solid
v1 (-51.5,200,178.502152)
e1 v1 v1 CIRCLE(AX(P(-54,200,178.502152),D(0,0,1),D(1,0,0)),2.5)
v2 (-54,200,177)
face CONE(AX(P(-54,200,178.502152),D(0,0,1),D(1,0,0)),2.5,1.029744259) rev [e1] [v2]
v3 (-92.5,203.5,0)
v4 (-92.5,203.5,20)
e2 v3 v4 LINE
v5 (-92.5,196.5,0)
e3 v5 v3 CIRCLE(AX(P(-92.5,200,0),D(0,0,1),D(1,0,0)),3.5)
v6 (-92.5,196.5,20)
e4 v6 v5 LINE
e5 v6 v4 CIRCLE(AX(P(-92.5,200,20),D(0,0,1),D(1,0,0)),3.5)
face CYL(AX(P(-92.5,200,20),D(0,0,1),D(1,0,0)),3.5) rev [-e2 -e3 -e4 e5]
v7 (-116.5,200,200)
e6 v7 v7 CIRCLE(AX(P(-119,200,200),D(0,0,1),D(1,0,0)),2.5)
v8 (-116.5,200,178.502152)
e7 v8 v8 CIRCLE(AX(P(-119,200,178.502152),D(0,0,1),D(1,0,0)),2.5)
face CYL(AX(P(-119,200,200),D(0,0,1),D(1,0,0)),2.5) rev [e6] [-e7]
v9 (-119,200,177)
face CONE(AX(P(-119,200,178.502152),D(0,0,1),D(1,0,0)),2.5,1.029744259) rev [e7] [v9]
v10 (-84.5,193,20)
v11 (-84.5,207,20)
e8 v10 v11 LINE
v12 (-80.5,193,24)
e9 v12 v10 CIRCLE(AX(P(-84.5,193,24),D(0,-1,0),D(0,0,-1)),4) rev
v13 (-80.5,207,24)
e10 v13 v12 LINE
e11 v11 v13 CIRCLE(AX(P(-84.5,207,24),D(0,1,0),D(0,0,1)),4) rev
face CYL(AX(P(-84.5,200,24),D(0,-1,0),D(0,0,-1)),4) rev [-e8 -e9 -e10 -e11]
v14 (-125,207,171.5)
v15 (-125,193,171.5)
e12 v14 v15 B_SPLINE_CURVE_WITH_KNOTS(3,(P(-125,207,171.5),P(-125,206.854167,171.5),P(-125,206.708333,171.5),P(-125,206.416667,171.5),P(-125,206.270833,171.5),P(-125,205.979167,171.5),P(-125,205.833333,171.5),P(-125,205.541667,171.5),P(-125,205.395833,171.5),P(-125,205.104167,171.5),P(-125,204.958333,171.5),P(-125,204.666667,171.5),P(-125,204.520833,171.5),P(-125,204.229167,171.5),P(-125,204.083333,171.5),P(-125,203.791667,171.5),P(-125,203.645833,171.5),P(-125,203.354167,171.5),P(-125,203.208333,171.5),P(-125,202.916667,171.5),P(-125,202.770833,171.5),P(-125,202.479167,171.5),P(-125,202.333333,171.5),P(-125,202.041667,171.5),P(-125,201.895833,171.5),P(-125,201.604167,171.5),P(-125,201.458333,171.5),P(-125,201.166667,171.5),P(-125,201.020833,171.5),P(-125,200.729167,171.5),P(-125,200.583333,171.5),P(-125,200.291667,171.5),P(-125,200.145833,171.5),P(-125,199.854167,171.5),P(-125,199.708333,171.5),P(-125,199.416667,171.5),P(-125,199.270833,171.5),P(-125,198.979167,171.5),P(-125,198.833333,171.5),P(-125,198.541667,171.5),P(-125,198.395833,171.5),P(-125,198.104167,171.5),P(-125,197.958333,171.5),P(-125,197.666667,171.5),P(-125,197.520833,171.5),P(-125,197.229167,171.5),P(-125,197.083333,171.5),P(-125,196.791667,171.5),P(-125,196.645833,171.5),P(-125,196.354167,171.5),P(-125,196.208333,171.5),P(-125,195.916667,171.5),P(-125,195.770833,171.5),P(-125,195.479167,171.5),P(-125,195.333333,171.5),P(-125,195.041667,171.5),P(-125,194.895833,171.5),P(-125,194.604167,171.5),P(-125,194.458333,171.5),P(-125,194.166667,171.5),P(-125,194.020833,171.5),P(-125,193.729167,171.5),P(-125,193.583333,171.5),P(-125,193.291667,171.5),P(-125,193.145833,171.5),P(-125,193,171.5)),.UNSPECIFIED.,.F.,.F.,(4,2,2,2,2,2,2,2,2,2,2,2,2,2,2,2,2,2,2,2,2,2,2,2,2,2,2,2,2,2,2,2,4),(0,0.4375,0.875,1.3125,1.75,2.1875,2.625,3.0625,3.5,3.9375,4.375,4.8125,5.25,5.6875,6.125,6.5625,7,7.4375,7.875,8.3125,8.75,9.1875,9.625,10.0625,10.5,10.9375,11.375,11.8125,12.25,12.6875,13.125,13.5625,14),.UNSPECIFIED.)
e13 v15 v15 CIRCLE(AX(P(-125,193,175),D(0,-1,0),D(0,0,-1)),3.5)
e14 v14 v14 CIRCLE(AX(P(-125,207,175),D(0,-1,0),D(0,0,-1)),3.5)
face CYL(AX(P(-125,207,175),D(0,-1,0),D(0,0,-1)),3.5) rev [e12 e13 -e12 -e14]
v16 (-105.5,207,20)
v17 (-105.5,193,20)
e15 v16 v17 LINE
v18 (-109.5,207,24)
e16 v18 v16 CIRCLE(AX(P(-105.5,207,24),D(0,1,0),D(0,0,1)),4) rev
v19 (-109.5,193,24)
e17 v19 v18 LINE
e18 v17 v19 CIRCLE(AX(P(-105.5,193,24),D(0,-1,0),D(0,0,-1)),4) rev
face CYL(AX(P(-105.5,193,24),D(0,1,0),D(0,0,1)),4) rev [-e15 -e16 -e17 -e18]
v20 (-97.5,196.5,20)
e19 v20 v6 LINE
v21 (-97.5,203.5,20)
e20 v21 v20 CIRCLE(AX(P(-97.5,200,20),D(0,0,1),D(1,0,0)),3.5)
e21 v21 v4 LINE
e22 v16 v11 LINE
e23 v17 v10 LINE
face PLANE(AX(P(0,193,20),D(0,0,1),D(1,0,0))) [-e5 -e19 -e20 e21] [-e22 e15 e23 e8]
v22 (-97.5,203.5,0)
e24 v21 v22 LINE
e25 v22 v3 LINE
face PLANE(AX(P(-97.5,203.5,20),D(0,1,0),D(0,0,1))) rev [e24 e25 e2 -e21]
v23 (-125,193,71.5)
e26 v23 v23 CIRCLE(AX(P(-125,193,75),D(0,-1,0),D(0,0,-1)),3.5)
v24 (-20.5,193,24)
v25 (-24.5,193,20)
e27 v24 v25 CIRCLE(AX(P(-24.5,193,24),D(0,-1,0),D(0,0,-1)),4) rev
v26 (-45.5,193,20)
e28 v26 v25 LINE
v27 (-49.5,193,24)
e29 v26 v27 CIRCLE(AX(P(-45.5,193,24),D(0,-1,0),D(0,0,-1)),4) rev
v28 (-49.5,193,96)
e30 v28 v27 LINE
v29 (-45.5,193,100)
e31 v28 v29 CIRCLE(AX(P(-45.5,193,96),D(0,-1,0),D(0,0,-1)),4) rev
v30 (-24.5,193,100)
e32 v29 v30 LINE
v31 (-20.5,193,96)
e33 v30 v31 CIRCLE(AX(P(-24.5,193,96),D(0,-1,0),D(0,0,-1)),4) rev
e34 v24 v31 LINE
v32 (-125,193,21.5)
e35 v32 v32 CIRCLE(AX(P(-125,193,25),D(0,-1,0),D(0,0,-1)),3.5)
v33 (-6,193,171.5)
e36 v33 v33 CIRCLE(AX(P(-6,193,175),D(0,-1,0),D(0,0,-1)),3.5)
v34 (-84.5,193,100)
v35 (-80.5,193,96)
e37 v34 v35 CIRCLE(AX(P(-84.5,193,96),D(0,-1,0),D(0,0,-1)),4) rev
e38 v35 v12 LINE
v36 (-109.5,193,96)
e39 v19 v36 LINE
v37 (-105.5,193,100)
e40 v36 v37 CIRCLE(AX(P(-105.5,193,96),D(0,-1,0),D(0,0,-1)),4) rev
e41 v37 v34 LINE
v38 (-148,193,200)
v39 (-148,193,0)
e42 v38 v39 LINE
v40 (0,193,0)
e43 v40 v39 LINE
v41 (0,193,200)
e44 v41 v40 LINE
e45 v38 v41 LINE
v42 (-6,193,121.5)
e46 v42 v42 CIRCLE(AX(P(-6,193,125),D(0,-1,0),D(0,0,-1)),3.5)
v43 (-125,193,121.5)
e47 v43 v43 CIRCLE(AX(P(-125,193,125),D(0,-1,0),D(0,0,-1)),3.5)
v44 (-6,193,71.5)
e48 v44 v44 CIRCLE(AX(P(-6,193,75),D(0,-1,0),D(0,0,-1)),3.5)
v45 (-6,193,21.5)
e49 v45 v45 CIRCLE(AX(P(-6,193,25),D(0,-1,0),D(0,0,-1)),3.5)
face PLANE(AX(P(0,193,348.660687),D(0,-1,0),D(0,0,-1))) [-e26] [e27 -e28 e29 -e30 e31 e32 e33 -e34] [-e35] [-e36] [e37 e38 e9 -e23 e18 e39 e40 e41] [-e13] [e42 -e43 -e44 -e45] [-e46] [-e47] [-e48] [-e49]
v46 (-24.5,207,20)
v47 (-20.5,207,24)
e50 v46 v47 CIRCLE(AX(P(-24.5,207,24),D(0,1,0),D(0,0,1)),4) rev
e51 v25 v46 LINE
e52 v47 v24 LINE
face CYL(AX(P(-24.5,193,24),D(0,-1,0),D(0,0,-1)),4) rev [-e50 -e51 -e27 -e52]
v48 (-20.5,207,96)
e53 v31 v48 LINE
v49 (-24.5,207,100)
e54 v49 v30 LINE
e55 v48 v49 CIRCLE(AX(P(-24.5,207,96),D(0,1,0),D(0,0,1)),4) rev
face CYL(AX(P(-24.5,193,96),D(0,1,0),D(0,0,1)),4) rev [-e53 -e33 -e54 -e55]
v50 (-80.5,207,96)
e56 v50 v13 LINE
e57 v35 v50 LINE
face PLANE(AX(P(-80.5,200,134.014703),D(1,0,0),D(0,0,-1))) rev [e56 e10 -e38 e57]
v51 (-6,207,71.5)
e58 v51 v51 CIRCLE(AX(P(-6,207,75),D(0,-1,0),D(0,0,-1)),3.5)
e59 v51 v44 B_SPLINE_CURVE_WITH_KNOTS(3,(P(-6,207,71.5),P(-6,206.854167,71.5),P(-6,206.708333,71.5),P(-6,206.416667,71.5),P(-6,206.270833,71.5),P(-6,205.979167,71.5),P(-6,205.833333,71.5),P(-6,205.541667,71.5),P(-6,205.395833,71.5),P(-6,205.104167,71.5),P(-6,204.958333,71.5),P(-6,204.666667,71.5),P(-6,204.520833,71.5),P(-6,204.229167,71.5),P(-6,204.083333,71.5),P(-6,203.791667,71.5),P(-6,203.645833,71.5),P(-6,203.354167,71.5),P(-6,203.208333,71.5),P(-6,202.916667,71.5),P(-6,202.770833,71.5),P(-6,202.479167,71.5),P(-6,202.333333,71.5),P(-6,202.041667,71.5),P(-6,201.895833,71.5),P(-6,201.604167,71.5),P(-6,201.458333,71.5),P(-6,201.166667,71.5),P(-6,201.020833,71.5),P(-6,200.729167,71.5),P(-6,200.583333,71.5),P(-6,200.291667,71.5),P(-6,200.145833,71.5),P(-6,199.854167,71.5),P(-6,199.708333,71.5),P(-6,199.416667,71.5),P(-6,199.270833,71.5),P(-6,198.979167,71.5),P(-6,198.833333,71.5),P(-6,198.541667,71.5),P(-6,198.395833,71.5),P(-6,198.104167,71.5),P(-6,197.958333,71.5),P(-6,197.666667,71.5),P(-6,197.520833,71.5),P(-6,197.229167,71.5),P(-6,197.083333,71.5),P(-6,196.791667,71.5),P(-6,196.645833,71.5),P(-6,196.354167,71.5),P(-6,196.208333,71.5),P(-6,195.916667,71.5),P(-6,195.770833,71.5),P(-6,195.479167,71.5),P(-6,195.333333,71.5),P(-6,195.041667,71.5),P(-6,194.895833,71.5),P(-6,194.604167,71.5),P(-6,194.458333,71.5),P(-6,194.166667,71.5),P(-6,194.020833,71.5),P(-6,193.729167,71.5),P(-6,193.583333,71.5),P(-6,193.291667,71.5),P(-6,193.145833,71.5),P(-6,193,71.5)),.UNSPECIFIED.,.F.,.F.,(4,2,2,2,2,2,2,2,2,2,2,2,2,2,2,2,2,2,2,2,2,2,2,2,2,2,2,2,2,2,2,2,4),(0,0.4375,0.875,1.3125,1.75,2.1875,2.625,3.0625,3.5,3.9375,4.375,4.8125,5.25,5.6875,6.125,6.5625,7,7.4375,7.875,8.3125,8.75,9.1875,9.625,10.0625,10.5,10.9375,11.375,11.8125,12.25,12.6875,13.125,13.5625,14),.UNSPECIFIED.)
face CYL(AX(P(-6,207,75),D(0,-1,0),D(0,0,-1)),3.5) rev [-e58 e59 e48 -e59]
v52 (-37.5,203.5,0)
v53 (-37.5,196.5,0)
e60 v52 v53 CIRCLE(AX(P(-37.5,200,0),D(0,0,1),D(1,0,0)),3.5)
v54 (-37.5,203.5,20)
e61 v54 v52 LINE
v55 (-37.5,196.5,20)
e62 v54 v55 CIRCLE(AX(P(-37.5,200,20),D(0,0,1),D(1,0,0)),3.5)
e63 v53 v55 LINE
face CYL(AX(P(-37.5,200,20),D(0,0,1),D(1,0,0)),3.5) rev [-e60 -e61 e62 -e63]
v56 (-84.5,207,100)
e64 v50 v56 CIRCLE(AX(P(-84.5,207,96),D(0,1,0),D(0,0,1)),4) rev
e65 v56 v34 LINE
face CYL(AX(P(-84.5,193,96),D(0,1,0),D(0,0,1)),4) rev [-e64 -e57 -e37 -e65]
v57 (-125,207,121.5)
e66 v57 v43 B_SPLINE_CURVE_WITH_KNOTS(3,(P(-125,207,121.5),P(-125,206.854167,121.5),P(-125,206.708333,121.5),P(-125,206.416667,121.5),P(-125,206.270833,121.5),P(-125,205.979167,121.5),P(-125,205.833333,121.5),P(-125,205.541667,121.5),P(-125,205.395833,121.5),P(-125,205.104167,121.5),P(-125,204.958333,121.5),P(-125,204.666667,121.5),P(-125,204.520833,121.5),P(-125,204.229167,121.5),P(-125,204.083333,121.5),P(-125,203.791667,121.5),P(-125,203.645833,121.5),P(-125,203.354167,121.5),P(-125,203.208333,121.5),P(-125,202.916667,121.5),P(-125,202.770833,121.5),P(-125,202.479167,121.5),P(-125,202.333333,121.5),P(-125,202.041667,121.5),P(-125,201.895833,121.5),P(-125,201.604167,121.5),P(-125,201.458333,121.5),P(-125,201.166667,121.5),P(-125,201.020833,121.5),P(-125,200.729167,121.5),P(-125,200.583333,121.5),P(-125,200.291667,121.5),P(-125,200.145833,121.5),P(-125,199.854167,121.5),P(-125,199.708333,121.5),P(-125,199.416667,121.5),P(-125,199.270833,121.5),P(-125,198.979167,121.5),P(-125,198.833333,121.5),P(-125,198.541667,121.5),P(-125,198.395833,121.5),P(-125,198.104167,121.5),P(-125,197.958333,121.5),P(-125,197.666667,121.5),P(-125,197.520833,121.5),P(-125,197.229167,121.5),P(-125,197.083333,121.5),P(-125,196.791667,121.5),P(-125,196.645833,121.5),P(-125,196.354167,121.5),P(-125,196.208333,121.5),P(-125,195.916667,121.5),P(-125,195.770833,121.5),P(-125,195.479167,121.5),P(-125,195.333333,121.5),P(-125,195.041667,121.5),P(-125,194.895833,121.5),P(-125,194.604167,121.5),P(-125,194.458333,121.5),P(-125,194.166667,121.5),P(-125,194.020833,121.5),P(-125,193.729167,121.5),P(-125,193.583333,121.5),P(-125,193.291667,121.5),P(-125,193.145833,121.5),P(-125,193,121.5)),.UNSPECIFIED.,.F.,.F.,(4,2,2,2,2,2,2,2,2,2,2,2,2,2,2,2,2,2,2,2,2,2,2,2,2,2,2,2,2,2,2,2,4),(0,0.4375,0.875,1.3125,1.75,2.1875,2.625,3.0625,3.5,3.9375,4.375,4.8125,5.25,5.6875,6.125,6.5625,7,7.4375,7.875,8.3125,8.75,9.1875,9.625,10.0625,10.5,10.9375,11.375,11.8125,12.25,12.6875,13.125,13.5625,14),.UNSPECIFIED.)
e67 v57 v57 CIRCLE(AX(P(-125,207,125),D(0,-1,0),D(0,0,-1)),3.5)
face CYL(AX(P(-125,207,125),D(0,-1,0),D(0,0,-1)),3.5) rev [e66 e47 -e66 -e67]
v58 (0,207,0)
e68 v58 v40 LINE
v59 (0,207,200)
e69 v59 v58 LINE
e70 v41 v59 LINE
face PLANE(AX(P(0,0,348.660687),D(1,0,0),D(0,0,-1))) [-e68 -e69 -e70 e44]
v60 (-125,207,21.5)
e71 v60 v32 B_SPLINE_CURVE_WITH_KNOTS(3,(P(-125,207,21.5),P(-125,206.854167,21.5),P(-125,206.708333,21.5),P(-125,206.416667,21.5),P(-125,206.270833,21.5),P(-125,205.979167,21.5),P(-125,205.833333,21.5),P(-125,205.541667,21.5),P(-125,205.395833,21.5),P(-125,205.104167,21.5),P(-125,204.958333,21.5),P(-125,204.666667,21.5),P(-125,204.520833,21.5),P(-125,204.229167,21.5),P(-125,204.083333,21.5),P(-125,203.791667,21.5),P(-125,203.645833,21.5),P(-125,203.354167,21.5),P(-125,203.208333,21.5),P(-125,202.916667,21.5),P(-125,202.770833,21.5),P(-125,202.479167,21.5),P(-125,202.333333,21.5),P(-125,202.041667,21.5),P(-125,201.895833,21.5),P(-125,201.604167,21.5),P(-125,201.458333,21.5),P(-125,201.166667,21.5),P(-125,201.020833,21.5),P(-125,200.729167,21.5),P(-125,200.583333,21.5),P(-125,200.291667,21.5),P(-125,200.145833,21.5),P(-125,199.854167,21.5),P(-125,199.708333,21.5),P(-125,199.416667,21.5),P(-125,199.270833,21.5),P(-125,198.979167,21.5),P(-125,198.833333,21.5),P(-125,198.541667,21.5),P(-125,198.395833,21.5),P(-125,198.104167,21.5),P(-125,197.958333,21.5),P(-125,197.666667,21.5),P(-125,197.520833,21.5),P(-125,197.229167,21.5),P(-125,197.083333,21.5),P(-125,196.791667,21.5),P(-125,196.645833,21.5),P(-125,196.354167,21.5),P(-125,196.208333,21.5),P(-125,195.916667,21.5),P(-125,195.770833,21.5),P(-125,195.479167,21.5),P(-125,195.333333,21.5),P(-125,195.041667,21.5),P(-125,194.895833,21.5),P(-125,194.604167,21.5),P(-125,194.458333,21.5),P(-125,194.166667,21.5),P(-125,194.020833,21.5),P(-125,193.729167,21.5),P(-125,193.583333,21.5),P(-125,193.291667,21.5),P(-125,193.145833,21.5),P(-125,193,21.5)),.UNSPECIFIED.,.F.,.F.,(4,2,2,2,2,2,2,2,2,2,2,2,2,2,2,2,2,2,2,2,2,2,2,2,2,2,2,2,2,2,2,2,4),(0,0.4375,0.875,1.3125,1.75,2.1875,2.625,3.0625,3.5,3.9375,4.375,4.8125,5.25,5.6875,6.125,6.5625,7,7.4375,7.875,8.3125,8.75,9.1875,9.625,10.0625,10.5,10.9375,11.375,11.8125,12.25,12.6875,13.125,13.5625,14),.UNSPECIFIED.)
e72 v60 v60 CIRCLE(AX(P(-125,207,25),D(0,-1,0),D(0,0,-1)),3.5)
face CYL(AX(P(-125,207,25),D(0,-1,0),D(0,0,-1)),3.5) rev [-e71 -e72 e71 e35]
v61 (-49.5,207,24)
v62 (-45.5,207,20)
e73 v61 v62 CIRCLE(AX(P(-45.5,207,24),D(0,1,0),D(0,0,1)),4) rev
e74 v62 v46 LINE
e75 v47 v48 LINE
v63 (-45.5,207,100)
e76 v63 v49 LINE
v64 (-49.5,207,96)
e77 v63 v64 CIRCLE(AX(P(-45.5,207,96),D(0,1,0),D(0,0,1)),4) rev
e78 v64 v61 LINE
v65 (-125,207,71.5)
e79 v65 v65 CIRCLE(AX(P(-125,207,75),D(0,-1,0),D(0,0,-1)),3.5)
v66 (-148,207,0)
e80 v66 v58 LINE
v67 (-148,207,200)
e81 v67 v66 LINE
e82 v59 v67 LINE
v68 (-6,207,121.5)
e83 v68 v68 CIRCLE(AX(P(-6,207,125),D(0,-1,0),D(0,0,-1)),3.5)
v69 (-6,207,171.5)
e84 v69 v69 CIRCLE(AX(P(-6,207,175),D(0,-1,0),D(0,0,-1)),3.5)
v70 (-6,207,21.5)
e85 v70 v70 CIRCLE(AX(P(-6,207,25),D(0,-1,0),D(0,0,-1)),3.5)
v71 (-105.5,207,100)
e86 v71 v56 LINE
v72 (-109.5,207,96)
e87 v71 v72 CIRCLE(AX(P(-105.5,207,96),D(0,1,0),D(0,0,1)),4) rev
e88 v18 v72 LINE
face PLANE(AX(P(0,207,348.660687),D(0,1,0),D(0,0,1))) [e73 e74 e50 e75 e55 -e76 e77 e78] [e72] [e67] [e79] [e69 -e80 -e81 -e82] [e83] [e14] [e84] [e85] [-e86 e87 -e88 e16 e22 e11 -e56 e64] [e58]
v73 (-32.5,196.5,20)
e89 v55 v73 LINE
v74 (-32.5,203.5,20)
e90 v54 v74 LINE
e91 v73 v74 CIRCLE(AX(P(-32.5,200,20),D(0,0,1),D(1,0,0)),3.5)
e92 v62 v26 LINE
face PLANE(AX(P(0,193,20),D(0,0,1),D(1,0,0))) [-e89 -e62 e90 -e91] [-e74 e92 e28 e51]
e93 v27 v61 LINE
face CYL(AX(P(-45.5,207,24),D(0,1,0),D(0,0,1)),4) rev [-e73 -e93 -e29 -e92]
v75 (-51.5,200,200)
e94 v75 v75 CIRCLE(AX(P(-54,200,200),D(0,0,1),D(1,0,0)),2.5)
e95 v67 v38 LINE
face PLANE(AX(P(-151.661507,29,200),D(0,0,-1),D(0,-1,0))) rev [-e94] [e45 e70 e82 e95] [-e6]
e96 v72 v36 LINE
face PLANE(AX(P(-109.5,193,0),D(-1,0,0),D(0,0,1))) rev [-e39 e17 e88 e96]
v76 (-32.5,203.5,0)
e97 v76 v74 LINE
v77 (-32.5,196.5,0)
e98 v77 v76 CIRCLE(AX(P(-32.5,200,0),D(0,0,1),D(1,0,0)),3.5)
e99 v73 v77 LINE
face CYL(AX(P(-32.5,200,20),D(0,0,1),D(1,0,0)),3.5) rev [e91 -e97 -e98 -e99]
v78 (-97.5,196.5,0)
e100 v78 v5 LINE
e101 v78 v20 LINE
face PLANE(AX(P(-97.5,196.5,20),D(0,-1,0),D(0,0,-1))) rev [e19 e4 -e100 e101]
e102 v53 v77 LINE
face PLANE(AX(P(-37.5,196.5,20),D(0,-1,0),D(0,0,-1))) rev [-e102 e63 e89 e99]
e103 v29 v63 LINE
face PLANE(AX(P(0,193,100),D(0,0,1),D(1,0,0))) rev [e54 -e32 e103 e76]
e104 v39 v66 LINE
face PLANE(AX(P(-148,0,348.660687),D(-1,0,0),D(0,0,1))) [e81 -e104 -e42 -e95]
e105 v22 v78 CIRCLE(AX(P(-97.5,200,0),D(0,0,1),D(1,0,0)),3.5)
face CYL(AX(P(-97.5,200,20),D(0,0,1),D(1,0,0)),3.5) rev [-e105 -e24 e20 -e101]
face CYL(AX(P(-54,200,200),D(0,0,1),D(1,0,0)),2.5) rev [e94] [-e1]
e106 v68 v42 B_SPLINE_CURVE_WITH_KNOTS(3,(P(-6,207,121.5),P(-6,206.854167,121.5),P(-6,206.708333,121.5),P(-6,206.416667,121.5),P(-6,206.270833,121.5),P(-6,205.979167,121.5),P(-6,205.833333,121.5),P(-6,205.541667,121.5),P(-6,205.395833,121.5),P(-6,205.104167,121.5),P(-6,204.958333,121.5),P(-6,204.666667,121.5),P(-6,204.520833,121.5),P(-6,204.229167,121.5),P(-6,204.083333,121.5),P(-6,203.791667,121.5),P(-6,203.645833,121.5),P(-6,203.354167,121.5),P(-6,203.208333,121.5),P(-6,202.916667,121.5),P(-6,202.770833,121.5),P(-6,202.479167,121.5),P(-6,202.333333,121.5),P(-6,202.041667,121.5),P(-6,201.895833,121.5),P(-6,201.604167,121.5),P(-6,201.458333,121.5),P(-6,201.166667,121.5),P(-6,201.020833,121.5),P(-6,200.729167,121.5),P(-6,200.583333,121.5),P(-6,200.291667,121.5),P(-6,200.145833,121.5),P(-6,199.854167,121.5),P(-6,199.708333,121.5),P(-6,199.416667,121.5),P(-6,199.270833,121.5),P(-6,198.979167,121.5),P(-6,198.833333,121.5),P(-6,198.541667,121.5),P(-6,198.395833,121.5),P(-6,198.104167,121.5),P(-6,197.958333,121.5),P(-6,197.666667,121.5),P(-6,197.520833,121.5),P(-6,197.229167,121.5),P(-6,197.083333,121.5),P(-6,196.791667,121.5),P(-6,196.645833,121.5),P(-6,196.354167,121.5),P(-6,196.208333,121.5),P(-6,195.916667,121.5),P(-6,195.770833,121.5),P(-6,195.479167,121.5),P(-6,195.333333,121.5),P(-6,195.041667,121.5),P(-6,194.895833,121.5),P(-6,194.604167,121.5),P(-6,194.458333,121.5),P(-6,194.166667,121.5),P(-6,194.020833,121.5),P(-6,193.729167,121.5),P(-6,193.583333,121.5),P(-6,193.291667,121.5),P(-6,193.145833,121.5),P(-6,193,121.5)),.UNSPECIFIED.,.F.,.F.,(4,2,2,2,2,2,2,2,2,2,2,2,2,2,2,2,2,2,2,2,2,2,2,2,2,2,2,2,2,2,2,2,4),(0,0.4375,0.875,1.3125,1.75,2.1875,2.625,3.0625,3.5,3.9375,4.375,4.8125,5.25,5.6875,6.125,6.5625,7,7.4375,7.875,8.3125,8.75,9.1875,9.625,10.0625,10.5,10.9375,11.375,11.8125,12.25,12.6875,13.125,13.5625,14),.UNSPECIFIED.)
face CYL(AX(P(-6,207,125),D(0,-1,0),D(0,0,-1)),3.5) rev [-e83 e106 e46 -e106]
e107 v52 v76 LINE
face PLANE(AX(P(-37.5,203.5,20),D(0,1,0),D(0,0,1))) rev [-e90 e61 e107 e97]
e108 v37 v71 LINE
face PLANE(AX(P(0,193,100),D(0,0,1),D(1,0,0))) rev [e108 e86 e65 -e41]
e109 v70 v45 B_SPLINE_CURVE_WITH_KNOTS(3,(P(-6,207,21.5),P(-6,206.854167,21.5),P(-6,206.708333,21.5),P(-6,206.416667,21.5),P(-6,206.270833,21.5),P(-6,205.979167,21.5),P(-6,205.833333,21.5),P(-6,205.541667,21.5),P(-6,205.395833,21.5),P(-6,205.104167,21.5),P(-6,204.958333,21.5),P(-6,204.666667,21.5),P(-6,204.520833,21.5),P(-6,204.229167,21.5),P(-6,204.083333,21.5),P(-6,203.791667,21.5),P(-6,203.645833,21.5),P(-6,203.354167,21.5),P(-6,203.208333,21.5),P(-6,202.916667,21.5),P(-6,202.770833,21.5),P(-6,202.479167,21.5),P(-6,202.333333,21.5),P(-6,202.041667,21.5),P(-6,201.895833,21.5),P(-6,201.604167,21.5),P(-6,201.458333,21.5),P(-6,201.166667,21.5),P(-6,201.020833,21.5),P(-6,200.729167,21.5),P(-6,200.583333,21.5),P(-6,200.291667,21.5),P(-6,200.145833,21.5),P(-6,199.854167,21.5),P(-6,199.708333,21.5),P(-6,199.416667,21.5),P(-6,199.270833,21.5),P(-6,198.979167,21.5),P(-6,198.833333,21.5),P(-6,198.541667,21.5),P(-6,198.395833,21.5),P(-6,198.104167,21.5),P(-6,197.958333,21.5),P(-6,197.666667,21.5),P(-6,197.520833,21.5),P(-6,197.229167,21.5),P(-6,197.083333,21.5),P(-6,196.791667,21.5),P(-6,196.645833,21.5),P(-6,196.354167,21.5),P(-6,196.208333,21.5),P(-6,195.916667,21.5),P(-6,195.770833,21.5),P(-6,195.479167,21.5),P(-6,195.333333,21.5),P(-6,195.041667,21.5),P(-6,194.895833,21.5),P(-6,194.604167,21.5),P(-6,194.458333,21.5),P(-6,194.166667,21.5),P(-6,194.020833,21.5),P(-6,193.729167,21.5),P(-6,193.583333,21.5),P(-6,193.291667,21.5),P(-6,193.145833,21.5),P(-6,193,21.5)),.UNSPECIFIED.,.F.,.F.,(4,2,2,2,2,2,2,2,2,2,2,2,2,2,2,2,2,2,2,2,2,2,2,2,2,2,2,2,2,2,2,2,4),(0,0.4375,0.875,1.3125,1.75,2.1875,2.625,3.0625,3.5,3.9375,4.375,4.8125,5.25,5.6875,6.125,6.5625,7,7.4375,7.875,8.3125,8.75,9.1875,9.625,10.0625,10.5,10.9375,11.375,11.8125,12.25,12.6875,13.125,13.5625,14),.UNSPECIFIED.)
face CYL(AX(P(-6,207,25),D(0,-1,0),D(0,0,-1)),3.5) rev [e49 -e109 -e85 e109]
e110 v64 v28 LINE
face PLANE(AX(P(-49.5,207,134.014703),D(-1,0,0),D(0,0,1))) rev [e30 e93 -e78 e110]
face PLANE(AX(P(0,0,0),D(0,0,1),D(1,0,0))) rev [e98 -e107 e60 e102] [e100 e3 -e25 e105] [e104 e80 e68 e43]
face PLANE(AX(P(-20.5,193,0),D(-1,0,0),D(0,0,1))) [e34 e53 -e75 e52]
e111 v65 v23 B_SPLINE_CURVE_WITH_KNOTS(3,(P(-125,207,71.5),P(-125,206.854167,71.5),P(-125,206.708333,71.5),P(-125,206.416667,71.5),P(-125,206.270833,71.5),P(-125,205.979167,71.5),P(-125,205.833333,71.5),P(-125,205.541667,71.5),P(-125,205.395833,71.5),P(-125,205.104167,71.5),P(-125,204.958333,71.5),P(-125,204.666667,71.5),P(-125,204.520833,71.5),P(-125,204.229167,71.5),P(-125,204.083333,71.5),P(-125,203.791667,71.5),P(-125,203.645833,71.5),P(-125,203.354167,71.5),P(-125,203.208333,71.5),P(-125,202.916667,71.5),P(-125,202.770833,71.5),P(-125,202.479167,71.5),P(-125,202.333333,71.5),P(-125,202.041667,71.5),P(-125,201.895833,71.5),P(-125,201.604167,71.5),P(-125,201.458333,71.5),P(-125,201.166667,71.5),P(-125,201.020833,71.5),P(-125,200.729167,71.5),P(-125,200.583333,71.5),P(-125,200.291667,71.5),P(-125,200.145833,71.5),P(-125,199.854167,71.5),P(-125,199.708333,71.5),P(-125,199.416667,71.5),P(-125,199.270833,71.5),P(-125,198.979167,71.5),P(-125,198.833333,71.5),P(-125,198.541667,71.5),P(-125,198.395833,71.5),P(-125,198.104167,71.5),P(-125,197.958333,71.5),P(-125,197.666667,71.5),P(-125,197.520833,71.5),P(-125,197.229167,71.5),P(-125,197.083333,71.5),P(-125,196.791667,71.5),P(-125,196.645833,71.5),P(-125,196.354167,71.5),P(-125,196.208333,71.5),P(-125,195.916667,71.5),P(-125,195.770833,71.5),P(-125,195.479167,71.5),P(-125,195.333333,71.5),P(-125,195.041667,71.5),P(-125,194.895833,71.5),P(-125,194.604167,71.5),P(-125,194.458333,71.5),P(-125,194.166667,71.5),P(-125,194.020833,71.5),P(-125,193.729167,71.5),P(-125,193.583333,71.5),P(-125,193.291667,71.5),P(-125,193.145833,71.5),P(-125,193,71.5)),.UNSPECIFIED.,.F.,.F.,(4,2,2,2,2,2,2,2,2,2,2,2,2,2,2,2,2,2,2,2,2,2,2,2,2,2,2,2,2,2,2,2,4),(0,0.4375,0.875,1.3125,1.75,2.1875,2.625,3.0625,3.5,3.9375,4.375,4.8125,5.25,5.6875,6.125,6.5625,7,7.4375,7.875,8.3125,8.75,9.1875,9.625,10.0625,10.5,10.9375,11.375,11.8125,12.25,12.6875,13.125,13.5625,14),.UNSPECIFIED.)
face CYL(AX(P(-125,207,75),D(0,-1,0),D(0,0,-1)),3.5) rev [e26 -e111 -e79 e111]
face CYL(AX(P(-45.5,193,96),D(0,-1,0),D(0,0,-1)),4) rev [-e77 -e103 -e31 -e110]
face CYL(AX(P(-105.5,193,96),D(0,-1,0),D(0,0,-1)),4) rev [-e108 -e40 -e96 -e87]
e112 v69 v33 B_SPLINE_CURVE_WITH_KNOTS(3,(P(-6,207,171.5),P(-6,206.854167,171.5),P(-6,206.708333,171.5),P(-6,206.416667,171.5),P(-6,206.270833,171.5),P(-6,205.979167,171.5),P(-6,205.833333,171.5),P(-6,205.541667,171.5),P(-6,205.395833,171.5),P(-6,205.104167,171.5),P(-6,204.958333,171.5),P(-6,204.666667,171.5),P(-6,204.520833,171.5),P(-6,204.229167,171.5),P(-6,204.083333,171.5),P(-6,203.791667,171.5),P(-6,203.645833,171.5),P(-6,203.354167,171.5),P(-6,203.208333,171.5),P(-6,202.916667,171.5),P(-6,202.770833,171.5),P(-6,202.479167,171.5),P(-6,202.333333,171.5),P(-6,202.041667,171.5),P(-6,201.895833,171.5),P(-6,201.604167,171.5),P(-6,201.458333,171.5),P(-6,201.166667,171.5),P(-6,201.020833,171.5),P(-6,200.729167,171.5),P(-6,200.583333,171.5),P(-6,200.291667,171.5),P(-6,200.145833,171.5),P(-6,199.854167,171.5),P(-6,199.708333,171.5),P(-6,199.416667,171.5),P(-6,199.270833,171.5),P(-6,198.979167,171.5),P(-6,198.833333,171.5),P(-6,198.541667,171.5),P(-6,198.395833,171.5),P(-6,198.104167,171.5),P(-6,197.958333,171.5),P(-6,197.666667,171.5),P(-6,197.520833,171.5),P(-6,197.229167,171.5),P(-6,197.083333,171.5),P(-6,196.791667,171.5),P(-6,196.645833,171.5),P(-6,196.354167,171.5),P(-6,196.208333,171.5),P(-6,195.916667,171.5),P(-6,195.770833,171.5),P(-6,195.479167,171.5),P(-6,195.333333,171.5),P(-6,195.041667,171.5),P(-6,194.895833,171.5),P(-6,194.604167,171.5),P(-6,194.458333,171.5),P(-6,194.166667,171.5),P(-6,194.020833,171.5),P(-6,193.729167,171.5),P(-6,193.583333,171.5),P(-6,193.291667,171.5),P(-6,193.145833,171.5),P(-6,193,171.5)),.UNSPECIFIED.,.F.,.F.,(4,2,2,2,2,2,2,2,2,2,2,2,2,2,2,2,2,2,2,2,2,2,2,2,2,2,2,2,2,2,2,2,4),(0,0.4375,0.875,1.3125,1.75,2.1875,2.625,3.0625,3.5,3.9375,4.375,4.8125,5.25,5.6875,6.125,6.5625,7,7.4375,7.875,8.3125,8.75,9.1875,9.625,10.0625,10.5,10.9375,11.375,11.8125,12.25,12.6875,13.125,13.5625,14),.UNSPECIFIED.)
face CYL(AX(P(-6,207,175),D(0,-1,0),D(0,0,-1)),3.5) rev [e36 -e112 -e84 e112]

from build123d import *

# Parameters (mm, degrees)
BOSS_EXTRUDE1_DEPTH       = 200
CUT_EXTRUDE1_DEPTH        = 250.198715888
F_6_0MM_DOWEL_SLOT1_DEPTH = 20
M6X1_0_TAPPED_HOLE1_D     = 5
M6X1_0_TAPPED_HOLE1_DEPTH = 21.497848452
M6X1_0_TAPPED_HOLE1_TIP   = 1.502151548
FILLET1_R                 = 4
BOSS_EXTRUDE2_DEPTH       = 80
FILLET2_R                 = 4
SKETCH13_R                = 3.5
CUT_EXTRUDE2_DEPTH        = 250.198715888


# Read off the part's stored shape, not the designer's step: Ø6.0mm Dowel Slot1
with BuildPart() as part:
    # Sketch1 → Boss-Extrude1 (new body)
    with BuildSketch(Plane.XY):
        Polygon((-21, 207), (-148, 207), (-148, 197.5), (-148, 193), (-24, 193), (-12, 193), (0, 193), (0, 207), (-12, 207), align=None)
    extrude(amount=BOSS_EXTRUDE1_DEPTH)

    # Sketch3 → Cut-Extrude1 (cut, through all)
    with BuildSketch(Plane(origin=(0, 207, 0), x_dir=(1, 0, 0), z_dir=(0, 1, 0))):
        Polygon((-20.5, -100), (-20.5, -20), (-22.5, -20), (-27.5, -20), (-39.5, -20), (-42, -20), (-107.5, -20), (-109.5, -20), (-109.5, -100), (-107.5, -100), (-42, -100), (-39.5, -100), (-27.5, -100), (-22.5, -100), align=None)
    extrude(amount=-CUT_EXTRUDE1_DEPTH, mode=Mode.SUBTRACT)

    # Ø6.0mm Dowel Slot1 outline → Ø6.0mm Dowel Slot1 (cut)
    with BuildSketch(Plane.XY):
        with BuildLine():
            Line((-37.5, 196.5), (-32.5, 196.5))
            ThreePointArc((-32.5, 196.5), (-29, 200), (-32.5, 203.5))
            Line((-32.5, 203.5), (-37.5, 203.5))
            ThreePointArc((-37.5, 203.5), (-41, 200), (-37.5, 196.5))
        make_face()
        with BuildLine():
            ThreePointArc((-92.5, 196.5), (-89, 200), (-92.5, 203.5))
            Line((-92.5, 203.5), (-97.5, 203.5))
            ThreePointArc((-97.5, 203.5), (-101, 200), (-97.5, 196.5))
            Line((-97.5, 196.5), (-92.5, 196.5))
        make_face()
    extrude(amount=F_6_0MM_DOWEL_SLOT1_DEPTH, mode=Mode.SUBTRACT)

    # M6x1.0 Tapped Hole1
    with Locations(Plane.XY.offset(200)):
        with Locations((-119, 200), (-54, 200)):
            Hole(M6X1_0_TAPPED_HOLE1_D / 2, depth=M6X1_0_TAPPED_HOLE1_DEPTH)
            with Locations((0, 0, -(M6X1_0_TAPPED_HOLE1_DEPTH + M6X1_0_TAPPED_HOLE1_TIP / 2))):  # 118° drill point
                Cone(0, M6X1_0_TAPPED_HOLE1_D / 2, M6X1_0_TAPPED_HOLE1_TIP, mode=Mode.SUBTRACT)

    # Fillet1
    fillet1_edges = [part.edges().sort_by_distance(p)[0] for p in [
        (-20.5, 200, 100),
        (-109.5, 200, 100),
        (-109.5, 200, 20),
        (-20.5, 200, 20),
    ]]
    fillet(fillet1_edges, radius=FILLET1_R)

    # Sketch15 → Boss-Extrude2 (add)
    with BuildSketch(Plane.XY.offset(20)):
        Polygon((-80.5, 200), (-80.5, 193), (-49.5, 193), (-49.5, 200), (-49.5, 207), (-80.5, 207), align=None)
    extrude(amount=BOSS_EXTRUDE2_DEPTH)

    # Fillet2
    fillet2_edges = [part.edges().sort_by_distance(p)[0] for p in [
        (-80.5, 200, 20),
        (-49.5, 200, 20),
        (-80.5, 200, 100),
        (-49.5, 200, 100),
    ]]
    fillet(fillet2_edges, radius=FILLET2_R)

    # Sketch13 → Cut-Extrude2 (cut, through all)
    with BuildSketch(Plane.XZ.offset(-193)):
        with Locations(Location((-6, 75, 0), (0, 0, 270))):
            Circle(SKETCH13_R)
        with Locations(Location((-6, 125, 0), (0, 0, 270))):
            Circle(SKETCH13_R)
        with Locations(Location((-6, 175, 0), (0, 0, 270))):
            Circle(SKETCH13_R)
        with Locations(Location((-125, 125, 0), (0, 0, 270))):
            Circle(SKETCH13_R)
        with Locations(Location((-125, 75, 0), (0, 0, 270))):
            Circle(SKETCH13_R)
        with Locations(Location((-6, 25, 0), (0, 0, 270))):
            Circle(SKETCH13_R)
        with Locations(Location((-125, 175, 0), (0, 0, 270))):
            Circle(SKETCH13_R)
        with Locations(Location((-125, 25, 0), (0, 0, 270))):
            Circle(SKETCH13_R)
    extrude(amount=-CUT_EXTRUDE2_DEPTH, mode=Mode.SUBTRACT)


solid = part.part
